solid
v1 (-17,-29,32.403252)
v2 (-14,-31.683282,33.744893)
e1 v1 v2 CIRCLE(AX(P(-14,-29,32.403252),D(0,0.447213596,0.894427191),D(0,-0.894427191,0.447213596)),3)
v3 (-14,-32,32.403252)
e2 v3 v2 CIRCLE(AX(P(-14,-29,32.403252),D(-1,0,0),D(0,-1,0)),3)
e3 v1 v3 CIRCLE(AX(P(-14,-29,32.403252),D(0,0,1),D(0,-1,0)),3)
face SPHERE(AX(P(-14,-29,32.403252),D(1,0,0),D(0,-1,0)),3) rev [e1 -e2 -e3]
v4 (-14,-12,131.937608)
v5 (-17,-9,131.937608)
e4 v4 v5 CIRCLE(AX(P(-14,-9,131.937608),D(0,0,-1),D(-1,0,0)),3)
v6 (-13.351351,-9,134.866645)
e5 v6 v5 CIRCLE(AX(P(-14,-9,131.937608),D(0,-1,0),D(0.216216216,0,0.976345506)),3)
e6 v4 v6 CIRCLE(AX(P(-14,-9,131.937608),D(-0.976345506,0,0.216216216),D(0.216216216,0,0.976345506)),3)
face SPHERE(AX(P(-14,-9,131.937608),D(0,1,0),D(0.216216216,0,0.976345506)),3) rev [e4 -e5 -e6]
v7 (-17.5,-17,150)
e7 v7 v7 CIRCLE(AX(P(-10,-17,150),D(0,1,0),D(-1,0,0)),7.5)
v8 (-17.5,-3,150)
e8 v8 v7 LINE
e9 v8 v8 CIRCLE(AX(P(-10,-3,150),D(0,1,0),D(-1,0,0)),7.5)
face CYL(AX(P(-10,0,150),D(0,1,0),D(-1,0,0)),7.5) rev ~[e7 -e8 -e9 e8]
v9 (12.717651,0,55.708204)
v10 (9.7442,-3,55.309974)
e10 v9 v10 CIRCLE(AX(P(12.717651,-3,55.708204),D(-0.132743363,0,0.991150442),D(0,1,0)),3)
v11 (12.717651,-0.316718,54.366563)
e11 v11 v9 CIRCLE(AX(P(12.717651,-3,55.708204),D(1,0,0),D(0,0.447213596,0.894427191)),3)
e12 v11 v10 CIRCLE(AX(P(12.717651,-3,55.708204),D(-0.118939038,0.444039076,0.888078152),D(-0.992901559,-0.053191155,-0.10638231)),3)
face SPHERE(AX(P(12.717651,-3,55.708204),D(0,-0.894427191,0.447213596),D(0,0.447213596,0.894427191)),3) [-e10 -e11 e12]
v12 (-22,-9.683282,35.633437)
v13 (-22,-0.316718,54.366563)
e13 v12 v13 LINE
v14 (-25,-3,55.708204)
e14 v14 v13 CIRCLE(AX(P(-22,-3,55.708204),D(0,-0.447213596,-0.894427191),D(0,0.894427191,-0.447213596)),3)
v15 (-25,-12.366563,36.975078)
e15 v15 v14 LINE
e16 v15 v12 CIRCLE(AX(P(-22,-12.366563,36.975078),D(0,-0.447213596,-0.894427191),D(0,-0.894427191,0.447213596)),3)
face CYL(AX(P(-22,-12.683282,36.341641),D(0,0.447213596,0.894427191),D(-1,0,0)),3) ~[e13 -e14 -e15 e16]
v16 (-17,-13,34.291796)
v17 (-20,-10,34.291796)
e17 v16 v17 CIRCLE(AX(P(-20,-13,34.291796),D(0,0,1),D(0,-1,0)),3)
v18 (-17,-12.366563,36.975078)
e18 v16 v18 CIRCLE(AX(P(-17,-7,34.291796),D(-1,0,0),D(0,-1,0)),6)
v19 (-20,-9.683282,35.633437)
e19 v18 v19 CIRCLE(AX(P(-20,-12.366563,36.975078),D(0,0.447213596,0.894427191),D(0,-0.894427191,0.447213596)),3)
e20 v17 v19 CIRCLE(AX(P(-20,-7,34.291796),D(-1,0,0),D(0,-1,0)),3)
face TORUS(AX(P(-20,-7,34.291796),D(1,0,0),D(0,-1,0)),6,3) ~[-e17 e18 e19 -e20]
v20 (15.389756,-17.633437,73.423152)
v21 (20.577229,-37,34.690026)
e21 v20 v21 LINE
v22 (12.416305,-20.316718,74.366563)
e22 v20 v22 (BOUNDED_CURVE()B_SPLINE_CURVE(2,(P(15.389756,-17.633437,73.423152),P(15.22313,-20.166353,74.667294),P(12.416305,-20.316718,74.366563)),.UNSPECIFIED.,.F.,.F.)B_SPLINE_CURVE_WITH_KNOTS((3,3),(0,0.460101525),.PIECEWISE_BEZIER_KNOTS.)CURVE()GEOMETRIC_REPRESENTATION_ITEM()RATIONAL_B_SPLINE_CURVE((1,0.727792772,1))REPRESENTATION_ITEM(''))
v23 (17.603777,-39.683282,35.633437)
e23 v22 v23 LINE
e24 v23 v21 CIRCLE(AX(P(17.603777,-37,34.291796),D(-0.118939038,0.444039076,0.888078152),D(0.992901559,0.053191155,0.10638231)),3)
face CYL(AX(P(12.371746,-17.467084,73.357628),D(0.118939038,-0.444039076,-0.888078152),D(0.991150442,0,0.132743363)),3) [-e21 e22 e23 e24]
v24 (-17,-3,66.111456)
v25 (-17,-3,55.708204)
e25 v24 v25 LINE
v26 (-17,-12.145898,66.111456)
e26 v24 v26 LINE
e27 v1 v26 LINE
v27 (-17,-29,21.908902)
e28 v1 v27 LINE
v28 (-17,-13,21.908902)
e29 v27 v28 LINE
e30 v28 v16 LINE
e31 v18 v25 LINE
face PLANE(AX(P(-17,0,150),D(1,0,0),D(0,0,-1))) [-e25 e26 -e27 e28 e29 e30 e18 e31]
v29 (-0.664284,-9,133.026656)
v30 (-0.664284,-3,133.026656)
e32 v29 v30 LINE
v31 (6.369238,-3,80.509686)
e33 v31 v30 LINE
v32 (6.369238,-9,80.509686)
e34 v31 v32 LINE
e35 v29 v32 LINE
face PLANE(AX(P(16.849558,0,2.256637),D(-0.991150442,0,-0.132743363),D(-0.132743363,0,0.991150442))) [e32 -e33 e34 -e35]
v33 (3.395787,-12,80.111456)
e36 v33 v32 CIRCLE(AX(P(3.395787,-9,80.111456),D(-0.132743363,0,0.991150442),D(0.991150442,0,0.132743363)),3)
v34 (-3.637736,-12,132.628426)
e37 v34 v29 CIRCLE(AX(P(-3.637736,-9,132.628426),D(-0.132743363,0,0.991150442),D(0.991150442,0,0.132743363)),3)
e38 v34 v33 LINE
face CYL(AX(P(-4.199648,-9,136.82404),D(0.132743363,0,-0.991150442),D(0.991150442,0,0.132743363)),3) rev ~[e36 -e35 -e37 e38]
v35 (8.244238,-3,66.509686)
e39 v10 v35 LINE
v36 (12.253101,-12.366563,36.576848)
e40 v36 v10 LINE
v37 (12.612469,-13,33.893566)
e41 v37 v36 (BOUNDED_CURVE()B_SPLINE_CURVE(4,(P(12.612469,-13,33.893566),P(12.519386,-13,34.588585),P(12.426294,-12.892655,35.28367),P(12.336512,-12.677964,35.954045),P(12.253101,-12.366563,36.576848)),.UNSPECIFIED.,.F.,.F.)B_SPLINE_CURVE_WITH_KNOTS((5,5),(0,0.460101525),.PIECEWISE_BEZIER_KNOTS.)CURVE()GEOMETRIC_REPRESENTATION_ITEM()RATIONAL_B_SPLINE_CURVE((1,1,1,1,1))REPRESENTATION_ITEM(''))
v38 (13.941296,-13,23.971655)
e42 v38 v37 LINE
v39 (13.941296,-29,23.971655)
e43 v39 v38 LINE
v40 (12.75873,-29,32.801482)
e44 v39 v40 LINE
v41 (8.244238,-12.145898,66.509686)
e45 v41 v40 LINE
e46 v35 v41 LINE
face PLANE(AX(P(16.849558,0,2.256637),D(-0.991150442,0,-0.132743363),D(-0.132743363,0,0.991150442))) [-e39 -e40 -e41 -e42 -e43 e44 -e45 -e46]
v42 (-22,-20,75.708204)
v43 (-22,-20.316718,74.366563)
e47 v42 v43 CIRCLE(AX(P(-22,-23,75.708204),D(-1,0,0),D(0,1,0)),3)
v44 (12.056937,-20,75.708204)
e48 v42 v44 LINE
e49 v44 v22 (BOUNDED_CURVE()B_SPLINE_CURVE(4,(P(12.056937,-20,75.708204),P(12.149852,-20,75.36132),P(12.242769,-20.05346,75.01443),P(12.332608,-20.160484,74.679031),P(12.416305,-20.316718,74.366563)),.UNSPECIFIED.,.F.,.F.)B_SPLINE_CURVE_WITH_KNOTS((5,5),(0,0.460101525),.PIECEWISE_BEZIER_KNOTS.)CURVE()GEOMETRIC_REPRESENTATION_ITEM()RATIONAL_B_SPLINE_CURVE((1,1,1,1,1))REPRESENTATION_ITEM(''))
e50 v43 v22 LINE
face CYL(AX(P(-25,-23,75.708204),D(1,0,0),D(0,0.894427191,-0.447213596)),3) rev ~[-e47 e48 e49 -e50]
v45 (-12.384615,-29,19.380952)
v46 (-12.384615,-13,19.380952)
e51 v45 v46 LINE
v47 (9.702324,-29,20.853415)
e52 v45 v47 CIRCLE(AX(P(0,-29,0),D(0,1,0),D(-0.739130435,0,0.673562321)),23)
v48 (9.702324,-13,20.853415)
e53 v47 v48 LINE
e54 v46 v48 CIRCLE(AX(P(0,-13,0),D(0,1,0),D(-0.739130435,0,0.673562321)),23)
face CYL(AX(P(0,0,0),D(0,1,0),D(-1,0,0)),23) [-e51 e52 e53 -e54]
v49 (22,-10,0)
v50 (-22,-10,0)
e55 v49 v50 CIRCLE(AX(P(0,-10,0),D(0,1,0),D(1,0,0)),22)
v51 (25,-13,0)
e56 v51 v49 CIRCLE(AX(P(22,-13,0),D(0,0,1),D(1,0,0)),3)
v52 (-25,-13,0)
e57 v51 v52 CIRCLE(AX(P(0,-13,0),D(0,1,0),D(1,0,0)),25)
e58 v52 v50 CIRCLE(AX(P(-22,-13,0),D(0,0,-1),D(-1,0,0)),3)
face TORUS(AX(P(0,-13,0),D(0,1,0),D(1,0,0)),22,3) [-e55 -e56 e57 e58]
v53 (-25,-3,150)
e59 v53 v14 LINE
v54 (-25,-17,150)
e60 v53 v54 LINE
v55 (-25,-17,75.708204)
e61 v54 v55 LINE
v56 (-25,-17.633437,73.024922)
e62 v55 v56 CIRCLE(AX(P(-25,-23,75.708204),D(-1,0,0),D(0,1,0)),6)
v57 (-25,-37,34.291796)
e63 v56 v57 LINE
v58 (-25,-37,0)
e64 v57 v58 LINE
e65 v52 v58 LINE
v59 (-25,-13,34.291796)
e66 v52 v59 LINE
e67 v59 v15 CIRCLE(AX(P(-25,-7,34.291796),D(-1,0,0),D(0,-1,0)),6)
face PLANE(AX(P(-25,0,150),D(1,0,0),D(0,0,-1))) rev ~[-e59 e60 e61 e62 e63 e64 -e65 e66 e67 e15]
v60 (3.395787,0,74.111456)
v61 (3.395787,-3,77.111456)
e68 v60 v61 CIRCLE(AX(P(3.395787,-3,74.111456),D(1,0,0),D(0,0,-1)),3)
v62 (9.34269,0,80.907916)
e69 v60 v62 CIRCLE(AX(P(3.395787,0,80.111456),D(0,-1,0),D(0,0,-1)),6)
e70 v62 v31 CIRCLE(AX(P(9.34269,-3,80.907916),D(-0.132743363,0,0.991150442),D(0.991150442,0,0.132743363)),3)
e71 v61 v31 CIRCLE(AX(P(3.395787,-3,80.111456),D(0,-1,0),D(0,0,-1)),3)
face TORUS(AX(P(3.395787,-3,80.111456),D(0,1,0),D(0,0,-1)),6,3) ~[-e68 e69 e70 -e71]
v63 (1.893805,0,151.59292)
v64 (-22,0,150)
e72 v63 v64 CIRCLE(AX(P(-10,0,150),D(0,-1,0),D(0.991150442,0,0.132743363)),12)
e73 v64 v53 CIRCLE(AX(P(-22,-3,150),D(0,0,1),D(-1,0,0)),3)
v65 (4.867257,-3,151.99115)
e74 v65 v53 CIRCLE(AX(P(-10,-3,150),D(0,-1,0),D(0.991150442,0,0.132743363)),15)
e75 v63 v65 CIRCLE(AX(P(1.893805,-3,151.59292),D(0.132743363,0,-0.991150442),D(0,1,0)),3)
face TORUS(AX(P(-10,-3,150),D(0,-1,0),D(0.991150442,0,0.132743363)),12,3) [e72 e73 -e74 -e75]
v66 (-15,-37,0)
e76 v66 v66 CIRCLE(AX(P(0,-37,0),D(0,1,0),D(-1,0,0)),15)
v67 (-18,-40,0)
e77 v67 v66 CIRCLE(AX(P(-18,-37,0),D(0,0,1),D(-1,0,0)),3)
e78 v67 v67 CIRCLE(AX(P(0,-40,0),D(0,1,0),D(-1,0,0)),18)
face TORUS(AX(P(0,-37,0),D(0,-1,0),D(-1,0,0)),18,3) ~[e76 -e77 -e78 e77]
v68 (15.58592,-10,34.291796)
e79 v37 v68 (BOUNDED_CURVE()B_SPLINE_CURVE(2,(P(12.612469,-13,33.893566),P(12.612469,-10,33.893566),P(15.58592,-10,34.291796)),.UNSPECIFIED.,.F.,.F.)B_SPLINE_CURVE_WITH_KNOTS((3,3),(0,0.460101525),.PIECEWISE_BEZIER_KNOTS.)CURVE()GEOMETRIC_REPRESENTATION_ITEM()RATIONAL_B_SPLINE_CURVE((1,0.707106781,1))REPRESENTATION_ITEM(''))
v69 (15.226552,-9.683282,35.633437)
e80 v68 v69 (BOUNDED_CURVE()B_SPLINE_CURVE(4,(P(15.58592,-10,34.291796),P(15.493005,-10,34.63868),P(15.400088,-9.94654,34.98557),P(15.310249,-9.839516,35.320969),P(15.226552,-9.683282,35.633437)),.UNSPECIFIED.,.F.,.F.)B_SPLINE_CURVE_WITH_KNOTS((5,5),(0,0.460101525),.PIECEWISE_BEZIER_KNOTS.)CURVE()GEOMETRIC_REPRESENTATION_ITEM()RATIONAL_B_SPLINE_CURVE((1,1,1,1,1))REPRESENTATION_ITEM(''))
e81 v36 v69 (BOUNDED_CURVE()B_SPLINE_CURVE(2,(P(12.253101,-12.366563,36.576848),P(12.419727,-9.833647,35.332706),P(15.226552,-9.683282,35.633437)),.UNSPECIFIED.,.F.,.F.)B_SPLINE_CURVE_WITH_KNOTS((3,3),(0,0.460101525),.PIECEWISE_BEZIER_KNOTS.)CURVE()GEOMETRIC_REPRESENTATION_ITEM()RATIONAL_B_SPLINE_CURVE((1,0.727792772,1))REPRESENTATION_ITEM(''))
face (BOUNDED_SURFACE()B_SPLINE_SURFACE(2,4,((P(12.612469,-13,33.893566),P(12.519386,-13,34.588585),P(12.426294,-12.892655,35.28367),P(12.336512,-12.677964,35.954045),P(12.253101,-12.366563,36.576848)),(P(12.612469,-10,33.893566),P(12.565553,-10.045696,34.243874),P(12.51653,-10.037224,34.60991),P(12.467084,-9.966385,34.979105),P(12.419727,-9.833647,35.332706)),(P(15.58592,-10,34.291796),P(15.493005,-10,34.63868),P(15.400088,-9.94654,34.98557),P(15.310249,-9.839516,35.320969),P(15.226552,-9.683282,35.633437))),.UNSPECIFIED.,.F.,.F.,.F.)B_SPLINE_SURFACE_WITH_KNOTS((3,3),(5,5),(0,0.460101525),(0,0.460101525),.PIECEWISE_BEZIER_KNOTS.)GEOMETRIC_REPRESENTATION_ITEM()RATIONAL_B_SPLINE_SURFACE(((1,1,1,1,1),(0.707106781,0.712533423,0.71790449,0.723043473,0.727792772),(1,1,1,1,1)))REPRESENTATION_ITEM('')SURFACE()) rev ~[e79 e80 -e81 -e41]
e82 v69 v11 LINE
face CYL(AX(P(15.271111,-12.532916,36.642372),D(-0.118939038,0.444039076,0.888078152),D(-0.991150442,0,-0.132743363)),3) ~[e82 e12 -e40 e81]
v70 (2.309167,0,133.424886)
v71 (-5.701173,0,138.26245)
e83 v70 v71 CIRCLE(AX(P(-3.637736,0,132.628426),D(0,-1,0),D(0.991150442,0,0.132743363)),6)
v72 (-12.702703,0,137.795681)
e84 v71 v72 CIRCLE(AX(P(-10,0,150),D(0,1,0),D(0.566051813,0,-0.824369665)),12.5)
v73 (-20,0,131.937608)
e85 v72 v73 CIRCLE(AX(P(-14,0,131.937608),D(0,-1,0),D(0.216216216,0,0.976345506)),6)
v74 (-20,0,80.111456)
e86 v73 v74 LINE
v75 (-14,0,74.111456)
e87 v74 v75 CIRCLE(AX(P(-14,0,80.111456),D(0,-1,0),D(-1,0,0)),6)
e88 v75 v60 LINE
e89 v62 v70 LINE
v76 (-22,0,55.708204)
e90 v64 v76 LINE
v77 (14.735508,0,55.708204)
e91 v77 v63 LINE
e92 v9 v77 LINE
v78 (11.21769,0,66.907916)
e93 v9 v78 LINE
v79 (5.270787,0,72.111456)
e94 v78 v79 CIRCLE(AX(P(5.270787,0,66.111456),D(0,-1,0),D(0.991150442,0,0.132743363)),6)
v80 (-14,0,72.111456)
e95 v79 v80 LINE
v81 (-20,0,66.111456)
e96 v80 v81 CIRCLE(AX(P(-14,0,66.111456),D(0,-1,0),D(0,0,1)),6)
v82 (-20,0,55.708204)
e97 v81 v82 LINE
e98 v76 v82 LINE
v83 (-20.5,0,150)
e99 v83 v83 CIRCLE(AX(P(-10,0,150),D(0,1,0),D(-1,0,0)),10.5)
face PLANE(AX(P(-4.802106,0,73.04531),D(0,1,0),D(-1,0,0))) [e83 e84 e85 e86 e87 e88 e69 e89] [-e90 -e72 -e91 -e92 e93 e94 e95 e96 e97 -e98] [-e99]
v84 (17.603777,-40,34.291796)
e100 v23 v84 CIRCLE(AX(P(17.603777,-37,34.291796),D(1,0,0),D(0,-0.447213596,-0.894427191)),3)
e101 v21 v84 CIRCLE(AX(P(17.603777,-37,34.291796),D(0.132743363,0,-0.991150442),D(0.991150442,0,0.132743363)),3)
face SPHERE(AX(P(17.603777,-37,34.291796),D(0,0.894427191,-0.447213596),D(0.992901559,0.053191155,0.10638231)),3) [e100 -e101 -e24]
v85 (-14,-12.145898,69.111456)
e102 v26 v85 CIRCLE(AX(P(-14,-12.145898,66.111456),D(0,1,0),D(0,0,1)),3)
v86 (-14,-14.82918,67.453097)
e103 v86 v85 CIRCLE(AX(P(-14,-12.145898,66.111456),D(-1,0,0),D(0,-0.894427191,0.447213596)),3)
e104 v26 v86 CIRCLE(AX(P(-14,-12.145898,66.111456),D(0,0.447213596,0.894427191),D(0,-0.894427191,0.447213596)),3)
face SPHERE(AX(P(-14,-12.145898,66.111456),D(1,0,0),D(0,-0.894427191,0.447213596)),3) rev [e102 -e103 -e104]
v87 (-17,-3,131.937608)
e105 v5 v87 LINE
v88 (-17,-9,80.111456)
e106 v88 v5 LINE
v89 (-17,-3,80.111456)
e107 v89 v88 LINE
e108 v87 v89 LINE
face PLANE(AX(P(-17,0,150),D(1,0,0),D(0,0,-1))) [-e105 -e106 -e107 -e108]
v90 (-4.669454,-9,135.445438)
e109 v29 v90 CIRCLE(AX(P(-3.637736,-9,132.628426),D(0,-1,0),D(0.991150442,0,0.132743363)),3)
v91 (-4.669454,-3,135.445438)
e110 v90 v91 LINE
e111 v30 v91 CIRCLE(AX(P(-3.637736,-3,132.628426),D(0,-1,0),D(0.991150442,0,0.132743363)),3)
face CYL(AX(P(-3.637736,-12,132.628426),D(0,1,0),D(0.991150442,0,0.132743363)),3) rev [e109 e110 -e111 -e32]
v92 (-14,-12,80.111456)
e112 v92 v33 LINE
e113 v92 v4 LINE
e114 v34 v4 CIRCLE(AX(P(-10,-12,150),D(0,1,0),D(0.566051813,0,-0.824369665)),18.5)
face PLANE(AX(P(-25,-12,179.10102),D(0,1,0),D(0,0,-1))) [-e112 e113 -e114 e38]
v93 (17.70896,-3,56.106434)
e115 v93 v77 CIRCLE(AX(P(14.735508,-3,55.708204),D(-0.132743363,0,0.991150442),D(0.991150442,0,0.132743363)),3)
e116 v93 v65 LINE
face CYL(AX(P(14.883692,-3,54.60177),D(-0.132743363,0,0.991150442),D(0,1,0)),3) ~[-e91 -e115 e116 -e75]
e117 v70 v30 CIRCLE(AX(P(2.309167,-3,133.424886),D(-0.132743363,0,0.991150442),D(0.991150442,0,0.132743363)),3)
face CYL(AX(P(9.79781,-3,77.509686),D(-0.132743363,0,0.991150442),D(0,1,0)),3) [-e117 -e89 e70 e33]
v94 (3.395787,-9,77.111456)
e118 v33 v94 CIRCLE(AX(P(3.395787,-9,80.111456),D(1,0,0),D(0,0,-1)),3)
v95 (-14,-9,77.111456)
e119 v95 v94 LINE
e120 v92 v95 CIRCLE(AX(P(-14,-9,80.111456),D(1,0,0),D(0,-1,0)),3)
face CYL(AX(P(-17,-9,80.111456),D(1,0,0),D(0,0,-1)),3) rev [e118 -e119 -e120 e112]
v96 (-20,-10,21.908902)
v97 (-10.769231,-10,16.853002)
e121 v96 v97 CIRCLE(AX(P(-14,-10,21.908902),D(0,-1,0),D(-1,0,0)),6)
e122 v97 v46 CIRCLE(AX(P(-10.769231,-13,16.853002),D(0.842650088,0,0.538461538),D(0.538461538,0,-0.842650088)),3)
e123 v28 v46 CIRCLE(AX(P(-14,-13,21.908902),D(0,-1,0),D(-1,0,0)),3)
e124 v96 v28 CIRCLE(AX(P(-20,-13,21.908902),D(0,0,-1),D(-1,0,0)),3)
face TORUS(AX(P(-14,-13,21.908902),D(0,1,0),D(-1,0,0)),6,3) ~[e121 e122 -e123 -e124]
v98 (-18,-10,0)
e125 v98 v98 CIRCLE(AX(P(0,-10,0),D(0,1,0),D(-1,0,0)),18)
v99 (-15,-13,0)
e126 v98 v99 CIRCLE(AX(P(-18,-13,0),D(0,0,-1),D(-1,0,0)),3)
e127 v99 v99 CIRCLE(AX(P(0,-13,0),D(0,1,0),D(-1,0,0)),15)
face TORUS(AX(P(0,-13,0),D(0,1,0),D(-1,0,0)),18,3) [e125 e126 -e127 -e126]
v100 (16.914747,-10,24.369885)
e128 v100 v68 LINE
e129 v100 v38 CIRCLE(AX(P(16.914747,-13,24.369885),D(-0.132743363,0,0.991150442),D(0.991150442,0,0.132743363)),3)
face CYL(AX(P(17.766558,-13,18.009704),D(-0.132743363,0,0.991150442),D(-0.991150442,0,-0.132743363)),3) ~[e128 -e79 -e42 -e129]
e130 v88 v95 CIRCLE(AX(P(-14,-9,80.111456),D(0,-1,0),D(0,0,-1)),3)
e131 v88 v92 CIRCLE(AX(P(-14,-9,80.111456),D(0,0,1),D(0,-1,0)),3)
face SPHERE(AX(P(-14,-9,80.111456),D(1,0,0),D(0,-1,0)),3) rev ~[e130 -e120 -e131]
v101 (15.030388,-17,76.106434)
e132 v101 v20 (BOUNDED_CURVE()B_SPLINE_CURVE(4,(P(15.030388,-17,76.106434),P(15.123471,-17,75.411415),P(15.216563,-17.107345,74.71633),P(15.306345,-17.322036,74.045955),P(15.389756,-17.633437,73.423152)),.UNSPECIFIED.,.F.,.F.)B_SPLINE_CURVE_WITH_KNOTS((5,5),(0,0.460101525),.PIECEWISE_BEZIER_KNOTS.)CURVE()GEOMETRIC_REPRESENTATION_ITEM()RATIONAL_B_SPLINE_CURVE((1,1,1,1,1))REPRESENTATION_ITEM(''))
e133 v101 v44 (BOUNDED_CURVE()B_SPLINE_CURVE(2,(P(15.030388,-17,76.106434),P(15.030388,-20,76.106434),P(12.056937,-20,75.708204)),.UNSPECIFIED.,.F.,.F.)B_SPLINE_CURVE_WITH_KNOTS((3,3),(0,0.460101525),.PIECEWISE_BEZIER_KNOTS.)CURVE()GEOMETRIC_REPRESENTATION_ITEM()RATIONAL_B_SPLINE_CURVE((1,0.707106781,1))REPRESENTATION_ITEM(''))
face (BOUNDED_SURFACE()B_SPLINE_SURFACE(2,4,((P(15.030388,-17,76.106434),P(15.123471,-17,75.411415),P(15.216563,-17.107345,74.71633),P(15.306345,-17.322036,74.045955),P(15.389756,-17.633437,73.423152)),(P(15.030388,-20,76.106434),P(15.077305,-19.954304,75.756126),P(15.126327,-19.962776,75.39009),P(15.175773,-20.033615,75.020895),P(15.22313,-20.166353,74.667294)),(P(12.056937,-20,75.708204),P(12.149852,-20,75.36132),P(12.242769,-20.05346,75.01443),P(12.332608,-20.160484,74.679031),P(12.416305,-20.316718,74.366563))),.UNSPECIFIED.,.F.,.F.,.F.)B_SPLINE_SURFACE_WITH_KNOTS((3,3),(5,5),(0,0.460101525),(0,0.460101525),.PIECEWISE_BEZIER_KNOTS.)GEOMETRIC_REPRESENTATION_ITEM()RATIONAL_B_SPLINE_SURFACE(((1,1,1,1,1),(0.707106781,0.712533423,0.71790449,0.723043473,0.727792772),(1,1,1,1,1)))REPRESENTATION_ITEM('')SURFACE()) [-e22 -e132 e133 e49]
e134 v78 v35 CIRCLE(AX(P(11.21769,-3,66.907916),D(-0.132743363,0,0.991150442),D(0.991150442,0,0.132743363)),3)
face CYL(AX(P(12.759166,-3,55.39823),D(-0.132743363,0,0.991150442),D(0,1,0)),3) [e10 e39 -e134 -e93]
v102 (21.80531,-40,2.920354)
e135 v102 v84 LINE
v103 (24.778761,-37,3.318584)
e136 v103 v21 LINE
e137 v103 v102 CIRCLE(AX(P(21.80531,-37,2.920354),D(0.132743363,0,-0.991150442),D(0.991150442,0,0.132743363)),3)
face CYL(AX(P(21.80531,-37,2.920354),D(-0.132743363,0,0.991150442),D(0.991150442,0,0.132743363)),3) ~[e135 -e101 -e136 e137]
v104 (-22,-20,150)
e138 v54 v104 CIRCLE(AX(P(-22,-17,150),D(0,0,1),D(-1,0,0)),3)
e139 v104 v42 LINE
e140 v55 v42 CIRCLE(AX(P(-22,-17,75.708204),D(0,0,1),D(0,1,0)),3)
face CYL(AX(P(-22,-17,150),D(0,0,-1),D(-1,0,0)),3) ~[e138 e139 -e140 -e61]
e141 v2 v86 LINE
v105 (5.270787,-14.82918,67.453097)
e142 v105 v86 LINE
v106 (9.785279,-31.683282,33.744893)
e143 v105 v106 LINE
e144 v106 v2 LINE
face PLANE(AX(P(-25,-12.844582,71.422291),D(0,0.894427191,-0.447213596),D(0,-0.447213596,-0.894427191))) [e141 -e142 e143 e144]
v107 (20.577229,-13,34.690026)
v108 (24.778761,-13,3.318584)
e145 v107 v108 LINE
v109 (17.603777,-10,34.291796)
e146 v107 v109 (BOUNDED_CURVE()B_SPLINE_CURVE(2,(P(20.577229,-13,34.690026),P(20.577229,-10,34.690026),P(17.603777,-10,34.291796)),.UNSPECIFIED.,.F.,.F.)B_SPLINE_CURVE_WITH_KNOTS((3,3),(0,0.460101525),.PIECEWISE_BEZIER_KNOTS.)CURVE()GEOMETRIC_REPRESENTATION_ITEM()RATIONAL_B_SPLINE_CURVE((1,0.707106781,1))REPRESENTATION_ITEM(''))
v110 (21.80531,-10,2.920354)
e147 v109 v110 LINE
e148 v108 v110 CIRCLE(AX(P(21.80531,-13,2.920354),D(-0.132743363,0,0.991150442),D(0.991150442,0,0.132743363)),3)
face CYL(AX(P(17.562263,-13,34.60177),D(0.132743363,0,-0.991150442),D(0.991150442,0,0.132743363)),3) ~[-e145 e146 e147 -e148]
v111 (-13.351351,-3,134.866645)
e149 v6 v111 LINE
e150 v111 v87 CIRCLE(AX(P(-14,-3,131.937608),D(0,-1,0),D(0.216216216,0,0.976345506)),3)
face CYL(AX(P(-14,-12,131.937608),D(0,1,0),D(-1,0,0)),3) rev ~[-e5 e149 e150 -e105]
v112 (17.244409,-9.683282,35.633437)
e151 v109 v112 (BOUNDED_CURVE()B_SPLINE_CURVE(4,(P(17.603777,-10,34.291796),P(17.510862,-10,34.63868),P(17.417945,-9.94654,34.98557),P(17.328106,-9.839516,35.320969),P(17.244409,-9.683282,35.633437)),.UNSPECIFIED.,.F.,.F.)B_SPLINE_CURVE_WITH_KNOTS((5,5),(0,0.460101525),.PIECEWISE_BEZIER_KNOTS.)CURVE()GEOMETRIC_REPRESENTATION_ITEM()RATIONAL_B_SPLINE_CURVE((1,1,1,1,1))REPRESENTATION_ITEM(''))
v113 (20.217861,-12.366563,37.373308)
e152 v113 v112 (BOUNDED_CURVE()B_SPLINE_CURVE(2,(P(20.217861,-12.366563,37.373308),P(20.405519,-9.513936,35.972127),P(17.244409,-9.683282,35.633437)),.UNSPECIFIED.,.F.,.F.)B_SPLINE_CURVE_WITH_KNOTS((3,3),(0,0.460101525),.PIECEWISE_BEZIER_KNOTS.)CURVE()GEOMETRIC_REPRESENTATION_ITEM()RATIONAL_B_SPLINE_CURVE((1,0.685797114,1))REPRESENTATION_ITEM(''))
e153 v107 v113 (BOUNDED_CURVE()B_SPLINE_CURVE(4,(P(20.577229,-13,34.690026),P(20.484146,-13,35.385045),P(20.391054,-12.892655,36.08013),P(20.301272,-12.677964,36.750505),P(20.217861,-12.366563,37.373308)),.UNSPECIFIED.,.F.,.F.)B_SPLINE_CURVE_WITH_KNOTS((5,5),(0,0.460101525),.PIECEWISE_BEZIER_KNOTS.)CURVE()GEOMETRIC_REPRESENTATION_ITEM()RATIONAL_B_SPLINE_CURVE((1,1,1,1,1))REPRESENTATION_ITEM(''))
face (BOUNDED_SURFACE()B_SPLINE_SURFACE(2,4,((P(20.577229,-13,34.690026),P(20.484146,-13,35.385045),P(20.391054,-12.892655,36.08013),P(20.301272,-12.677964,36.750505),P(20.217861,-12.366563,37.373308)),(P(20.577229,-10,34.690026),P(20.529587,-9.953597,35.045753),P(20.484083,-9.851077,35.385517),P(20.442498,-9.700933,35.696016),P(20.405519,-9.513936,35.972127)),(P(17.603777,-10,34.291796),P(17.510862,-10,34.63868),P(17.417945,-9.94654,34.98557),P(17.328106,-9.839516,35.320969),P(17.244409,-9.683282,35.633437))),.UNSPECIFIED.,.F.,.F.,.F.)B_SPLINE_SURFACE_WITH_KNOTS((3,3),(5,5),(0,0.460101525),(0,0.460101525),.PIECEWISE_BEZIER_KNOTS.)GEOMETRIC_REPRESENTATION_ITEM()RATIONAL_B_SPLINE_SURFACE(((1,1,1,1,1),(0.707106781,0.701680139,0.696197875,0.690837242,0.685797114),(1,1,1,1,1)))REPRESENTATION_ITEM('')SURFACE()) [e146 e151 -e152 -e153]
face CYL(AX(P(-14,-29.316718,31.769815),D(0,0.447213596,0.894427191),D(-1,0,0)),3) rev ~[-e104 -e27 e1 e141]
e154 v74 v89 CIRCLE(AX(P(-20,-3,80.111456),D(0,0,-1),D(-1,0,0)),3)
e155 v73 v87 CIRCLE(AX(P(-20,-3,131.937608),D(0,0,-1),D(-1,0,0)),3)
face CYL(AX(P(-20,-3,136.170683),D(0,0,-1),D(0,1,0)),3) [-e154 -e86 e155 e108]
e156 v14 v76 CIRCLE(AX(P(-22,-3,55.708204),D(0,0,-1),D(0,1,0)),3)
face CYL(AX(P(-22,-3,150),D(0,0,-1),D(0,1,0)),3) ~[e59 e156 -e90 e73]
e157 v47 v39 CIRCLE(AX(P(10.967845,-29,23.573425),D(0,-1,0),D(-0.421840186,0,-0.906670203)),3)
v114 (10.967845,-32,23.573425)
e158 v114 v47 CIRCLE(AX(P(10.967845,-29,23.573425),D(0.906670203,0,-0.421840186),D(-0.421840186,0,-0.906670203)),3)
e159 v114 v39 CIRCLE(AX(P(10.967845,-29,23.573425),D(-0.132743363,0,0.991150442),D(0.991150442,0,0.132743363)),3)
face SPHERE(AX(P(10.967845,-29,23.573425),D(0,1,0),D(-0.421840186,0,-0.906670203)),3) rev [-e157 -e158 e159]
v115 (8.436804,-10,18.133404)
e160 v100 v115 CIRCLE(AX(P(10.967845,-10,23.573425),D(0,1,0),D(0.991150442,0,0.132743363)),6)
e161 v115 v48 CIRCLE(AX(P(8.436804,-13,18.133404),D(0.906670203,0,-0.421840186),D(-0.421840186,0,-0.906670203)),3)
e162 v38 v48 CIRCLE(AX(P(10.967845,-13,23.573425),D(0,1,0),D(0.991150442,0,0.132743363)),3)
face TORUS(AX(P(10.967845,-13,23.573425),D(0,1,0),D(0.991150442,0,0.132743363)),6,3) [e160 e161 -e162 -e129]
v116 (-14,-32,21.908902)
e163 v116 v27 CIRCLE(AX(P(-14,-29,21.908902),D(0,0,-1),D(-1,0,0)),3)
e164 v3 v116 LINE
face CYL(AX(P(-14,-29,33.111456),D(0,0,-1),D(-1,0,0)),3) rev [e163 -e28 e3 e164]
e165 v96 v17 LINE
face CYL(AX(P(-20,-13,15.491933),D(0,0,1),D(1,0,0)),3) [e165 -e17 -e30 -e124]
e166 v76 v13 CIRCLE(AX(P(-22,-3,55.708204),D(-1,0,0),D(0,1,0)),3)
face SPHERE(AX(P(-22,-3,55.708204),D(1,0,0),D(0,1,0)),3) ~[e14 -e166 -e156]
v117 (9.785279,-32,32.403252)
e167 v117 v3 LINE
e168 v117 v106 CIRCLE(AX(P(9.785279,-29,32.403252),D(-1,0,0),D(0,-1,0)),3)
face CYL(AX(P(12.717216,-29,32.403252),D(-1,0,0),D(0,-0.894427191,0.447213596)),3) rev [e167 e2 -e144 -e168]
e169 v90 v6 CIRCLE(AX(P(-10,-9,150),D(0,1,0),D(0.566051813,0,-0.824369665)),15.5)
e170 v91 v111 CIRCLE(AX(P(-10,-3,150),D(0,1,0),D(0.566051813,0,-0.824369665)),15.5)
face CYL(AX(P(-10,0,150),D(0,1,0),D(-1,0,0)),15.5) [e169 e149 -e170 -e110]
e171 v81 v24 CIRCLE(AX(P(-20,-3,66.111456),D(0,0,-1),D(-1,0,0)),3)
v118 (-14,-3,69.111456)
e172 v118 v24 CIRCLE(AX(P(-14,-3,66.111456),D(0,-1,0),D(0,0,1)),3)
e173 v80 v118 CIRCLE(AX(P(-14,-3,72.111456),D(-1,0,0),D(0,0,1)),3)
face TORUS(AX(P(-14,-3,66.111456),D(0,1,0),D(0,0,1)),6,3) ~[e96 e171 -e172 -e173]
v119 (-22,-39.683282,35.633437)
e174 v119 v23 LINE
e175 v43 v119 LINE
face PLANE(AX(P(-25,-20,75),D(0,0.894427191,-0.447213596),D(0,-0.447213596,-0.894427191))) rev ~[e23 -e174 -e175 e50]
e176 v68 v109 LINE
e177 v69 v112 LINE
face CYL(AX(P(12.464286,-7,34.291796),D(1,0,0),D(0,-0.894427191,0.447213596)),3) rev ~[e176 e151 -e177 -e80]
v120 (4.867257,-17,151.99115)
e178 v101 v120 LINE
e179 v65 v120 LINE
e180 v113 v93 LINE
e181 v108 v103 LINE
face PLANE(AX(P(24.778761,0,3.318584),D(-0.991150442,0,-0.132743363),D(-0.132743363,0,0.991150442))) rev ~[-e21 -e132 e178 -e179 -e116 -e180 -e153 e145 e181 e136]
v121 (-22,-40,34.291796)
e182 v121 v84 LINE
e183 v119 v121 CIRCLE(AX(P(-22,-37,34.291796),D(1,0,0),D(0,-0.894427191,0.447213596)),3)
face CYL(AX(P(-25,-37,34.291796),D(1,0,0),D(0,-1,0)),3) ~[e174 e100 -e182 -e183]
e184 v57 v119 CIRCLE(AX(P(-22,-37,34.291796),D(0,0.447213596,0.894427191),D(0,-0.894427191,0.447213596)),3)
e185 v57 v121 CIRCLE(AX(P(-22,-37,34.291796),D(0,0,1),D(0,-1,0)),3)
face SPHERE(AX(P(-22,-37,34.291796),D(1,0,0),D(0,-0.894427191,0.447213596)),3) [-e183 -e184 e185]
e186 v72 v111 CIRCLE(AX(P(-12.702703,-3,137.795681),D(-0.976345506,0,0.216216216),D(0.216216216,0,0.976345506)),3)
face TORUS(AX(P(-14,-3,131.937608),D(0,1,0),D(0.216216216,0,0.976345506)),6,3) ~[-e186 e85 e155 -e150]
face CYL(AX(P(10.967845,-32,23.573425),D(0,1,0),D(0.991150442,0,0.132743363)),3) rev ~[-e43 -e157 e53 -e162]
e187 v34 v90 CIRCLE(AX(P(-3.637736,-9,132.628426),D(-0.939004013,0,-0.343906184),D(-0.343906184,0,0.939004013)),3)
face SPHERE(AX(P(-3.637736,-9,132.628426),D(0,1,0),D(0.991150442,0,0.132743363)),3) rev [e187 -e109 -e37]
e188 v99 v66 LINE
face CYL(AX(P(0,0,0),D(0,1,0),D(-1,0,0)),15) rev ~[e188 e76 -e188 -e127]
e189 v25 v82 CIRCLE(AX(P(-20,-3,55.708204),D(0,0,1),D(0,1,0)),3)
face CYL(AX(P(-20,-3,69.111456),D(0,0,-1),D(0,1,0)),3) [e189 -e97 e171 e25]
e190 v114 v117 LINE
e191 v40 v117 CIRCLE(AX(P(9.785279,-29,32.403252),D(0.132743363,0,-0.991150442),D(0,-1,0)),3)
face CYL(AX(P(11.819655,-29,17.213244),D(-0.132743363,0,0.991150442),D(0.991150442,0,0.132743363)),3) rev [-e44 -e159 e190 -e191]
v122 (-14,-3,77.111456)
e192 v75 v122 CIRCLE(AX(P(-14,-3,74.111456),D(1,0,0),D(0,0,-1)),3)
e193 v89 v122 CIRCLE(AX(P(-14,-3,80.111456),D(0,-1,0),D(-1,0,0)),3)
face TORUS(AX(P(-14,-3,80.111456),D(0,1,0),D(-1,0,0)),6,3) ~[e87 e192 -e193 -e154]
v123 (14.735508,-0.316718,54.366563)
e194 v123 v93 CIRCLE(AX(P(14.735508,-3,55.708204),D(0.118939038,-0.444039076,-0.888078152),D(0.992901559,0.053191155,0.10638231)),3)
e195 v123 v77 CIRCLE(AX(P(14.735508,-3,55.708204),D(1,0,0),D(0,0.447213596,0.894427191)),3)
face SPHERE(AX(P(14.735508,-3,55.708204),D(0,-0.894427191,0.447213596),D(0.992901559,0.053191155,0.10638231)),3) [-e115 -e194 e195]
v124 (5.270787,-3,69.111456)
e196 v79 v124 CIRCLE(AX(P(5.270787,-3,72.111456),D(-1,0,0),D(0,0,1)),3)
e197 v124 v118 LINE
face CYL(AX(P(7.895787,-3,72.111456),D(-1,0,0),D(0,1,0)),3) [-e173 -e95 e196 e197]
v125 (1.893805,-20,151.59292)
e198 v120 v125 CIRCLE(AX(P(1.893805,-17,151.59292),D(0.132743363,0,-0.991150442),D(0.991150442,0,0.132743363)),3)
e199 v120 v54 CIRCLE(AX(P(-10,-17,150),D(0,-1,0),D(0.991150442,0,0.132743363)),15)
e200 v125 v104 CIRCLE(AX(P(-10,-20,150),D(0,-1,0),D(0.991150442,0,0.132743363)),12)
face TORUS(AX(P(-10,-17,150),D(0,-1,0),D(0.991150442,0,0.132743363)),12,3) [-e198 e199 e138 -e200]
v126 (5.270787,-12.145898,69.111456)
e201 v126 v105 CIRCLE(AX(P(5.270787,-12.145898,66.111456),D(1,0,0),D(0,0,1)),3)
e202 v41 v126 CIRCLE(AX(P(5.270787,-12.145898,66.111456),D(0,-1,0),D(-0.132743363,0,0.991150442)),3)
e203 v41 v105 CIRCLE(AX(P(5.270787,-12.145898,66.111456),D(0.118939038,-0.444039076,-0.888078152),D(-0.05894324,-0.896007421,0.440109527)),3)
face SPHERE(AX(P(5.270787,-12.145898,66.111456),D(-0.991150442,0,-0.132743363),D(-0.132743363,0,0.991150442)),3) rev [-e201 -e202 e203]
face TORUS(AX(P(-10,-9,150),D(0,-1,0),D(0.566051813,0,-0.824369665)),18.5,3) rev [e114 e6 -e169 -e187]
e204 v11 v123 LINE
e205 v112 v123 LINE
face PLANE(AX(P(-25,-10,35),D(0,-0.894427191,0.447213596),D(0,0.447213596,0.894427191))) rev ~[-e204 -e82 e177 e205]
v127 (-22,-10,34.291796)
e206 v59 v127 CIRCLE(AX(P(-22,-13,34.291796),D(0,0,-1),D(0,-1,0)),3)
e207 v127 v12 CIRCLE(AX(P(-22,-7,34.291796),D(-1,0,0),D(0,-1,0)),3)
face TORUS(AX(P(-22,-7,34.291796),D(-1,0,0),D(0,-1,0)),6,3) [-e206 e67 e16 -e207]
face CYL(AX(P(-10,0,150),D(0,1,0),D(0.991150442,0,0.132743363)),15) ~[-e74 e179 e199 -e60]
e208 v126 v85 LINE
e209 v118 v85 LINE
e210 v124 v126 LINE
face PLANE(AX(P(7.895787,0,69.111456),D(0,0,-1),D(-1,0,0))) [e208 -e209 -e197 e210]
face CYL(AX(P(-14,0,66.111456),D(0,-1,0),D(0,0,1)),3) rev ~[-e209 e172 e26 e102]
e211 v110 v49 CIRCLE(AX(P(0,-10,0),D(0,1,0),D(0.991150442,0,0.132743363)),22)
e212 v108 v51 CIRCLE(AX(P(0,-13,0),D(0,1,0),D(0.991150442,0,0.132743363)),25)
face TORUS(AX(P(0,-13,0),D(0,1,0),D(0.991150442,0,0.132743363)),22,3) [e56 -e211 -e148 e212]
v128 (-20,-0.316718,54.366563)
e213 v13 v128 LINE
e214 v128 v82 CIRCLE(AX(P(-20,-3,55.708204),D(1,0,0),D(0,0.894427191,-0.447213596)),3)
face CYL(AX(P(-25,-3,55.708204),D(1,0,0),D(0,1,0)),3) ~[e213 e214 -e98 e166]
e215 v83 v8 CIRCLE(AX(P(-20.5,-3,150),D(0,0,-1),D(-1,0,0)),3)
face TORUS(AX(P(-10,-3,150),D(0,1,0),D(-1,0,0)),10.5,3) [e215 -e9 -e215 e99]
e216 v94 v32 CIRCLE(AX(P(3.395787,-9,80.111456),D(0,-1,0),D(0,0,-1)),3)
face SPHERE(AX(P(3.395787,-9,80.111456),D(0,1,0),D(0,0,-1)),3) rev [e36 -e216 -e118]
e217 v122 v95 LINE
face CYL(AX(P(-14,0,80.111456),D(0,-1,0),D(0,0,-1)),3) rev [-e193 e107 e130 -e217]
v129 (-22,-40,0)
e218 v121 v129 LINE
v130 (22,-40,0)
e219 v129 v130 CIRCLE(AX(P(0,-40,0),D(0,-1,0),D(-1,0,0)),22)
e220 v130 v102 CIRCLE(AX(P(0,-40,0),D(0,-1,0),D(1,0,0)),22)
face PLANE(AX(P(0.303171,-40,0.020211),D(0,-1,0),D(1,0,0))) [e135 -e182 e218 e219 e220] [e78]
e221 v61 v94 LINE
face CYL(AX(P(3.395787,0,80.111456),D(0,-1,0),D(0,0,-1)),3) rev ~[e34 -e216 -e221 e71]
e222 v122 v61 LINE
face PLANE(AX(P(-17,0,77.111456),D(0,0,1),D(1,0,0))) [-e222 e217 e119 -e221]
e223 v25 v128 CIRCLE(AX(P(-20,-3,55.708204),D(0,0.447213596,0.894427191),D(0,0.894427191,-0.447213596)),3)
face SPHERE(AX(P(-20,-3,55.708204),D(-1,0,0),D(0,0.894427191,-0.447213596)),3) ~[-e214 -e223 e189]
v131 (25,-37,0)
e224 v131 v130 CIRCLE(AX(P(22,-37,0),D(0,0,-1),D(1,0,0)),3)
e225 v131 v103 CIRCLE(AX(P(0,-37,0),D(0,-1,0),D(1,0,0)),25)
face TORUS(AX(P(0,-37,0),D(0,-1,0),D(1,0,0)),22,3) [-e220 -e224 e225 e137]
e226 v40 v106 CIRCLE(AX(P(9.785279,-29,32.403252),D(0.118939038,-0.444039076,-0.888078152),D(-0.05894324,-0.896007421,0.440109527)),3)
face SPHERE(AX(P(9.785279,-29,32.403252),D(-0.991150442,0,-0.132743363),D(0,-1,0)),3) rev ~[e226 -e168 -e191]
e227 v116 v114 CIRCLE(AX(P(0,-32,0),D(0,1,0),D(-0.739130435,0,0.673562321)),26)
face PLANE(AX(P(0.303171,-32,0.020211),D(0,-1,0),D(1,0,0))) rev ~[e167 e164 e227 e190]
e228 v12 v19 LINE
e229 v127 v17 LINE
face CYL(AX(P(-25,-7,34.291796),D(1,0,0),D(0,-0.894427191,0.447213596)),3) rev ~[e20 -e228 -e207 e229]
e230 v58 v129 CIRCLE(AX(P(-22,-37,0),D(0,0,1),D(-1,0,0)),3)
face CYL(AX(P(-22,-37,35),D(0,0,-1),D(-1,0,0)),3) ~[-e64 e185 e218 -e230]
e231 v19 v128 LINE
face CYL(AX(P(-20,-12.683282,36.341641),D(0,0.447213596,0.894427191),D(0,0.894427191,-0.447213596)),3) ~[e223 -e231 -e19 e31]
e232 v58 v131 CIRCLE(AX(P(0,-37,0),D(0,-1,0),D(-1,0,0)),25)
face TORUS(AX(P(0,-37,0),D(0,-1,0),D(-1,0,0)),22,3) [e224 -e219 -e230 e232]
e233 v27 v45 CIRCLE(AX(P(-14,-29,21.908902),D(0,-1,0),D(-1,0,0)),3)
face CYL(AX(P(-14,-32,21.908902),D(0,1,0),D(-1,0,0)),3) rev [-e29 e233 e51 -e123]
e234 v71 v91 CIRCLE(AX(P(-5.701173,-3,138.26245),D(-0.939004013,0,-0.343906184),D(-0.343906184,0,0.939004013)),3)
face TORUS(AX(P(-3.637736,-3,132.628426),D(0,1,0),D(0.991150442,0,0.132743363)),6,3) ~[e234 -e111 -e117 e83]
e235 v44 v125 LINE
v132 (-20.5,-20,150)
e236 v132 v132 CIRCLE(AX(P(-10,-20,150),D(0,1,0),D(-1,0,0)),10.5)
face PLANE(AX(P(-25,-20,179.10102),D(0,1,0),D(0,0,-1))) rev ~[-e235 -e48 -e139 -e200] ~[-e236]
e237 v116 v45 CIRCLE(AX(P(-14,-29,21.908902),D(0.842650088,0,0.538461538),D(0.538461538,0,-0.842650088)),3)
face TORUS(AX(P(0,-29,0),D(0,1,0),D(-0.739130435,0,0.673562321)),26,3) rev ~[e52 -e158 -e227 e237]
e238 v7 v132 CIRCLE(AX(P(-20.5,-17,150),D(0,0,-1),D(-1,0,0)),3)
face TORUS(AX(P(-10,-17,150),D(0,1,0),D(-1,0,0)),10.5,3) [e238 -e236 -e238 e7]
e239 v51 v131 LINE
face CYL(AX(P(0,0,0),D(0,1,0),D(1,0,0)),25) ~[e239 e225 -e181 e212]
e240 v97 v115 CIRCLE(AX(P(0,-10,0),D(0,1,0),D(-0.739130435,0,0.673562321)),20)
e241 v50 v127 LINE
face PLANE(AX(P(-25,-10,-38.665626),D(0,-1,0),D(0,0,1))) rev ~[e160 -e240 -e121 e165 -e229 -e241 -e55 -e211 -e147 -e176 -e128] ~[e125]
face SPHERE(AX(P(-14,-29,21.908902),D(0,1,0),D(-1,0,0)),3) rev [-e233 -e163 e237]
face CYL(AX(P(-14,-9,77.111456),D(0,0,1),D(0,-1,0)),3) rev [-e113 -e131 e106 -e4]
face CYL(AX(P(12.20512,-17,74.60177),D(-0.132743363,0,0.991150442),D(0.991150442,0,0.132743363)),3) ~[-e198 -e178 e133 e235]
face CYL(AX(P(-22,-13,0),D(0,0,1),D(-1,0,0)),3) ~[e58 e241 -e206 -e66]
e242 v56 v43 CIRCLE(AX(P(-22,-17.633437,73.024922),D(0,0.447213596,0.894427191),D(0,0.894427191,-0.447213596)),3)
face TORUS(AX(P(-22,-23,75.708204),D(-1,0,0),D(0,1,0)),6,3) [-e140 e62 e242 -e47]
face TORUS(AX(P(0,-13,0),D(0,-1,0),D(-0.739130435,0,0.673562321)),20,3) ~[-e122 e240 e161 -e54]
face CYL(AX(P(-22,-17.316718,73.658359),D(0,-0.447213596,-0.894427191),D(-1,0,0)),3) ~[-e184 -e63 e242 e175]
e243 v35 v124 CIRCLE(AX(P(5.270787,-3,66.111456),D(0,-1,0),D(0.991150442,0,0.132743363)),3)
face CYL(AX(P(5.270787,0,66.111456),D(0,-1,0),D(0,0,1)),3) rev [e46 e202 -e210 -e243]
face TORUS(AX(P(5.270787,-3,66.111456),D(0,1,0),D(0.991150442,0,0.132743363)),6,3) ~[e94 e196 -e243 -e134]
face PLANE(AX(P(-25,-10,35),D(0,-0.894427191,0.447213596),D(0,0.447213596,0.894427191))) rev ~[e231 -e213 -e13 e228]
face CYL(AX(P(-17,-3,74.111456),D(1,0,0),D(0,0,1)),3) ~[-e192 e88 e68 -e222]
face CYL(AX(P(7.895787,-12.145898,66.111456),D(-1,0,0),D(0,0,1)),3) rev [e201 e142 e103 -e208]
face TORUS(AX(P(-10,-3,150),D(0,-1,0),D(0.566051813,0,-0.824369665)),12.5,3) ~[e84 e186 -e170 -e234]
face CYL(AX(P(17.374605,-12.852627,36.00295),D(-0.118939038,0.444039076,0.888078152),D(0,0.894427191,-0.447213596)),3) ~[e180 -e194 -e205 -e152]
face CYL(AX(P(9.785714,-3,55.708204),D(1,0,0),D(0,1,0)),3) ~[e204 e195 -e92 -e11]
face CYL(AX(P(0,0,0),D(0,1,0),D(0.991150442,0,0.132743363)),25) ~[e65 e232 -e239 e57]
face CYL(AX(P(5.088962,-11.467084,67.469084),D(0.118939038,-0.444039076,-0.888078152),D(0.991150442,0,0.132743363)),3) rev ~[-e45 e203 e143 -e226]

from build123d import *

# Parameters (mm, degrees)
F1_DEPTH = 40
F3_DEPTH = 50.001
F4_R     = 7.5
F4_R_2   = 15
F5_DEPTH = 40.001
F6_T     = -8
F8_DEPTH = 14
F9_R     = 3


with BuildPart() as f1:
    # F0 (on Front) → F1 (new body)
    with BuildSketch(Plane.XZ):
        with BuildLine():
            ThreePointArc((-25, 0), (0, -25), (25, 0))
            ThreePointArc((25, 0), (24.9446289464, 1.6629752631), (24.7787610619, 3.3185840708))
            ThreePointArc((24.7787610619, 3.3185840708), (-1.6629752631, 24.9446289464), (-25, 0))
        make_face()
        with BuildLine():
            ThreePointArc((-25, 0), (-1.6629752631, 24.9446289464), (24.7787610619, 3.3185840708))
            Line((24.7787610619, 3.3185840708), (4.8672566372, 151.9911504425))
            ThreePointArc((4.8672566372, 151.9911504425), (4.9667773678, 150.9977851579), (5, 150))
            ThreePointArc((5, 150), (-10, 135), (-25, 150))
            Line((-25, 150), (-25, 0))
        make_face()
        with BuildLine():
            ThreePointArc((5, 150), (4.9667773678, 150.9977851579), (4.8672566372, 151.9911504425))
            ThreePointArc((4.8672566372, 151.9911504425), (-10.9977851579, 164.9667773678), (-25, 150))
            ThreePointArc((-25, 150), (-10, 135), (5, 150))
        make_face()
    extrude(amount=F1_DEPTH)

    # F2 (on face) → F3 (cut, through all)
    with BuildSketch(Plane(origin=(-25, 0, 0), x_dir=(0, -1, 0), z_dir=(-1, 0, 0))):
        Polygon((40, 179.1010204973), (20, 179.1010204973), (20, 75), (40, 35), align=None)
        Polygon((10, 35), (0, 55), (0, 3.7116128951), (0, -38.6656261981), (10, -38.6656261981), align=None)
    extrude(amount=-F3_DEPTH, mode=Mode.SUBTRACT)

    # F4 (on face) → F5 (cut, through all)
    with BuildSketch(Plane(origin=(0, 0, 0), x_dir=(-1, 0, 0), z_dir=(0, 1, 0))):
        with Locations((10, 150)):
            Circle(F4_R)
        Circle(F4_R_2)
    extrude(amount=-F5_DEPTH, mode=Mode.SUBTRACT)

    # F6
    f6_openings = [f1.faces().sort_by_distance(p)[0] for p in [
        (-6.733599, 0, 102.796196),
        (-2.895022, -5.050505, 44.89899),
        (-24.218975, -10, 17.5),
    ]]
    offset(amount=F6_T, openings=f6_openings)

    # F7 (on face) → F8 (join, through all)
    with BuildSketch(Plane(origin=(0, 0, 0), x_dir=(-1, 0, 0), z_dir=(0, 1, 0))):
        Polygon((17, 77.11145618), (-6.8243585473, 77.11145618), (-7.8957871187, 69.11145618), (17, 69.11145618), align=None)
    extrude(amount=-F8_DEPTH)

    # F9
    f9_edges = [f1.edges().sort_by_distance(p)[0] for p in [
        (-5.087821, -12, 77.111456),
        (2.799081, -12, 107.166863),
        (-8.968955, -12, 134.53433),
        (-17, -12, 106.64107),
        (-25, -20, 112.5),
        (11.3622, 0, 103.495575),
        (-10.997785, 0, 164.966777),
        (-10.997785, -20, 164.966777),
        (15, -10, 0),
        (-25, -30, 55),
        (-25, -40, 17.5),
        (-25, -10, 17.5),
        (22.657238, -40, 19.159292),
        (1.662975, -40, -24.944629),
        (17.857143, -30, 55),
        (15, -40, 0),
        (1.662975, -10, -24.944629),
        (-2.5, -20, 150),
        (10.022914, -20, 113.495575),
        (-25, 0, 102.5),
        (-4.910714, -20, 75),
        (-2.232143, -40, 35),
        (-25, -5, 45),
        (-2.5, 0, 150),
        (22.657238, -10, 19.159292),
        (-17, -23, 51.111456),
        (-2.141392, -32, 33.111456),
        (-17, -21, 15.491933),
        (-17, -10, 25.245967),
        (-17, -5, 45),
        (-17, 0, 62.055728),
        (-17, 0, 106.64107),
        (-17, -6, 136.170683),
        (-17, -32, 24.301695),
        (-5.087821, 0, 77.111456),
        (13.755161, -32, 25.361465),
        (-1.226197, -6, 137.22227),
        (8.840751, 0, 62.055728),
        (2.799081, 0, 107.166863),
        (-8.968955, 0, 134.53433),
        (-17, -7, 69.111456),
        (-4.552106, 0, 69.111456),
        (-4.552106, -14, 69.111456),
        (6.824359, -6, 77.111456),
        (-17, -6, 77.111456),
        (7.895787, -7, 69.111456),
        (19.196429, -5, 45),
        (-21, 0, 55),
        (13.821429, 0, 55),
        (-21, -10, 35),
        (16.5, -10, 35),
        (13.628696, -10, 26.305737),
        (-1.529937, -10, 22.949059),
        (11.125, -5, 45),
        (10.306501, -23, 51.111456),
        (14.793106, -21, 17.611474),
        (-1.529937, -32, 22.949059),
    ]]
    fillet(f9_edges, radius=F9_R)


solid = f1.part
